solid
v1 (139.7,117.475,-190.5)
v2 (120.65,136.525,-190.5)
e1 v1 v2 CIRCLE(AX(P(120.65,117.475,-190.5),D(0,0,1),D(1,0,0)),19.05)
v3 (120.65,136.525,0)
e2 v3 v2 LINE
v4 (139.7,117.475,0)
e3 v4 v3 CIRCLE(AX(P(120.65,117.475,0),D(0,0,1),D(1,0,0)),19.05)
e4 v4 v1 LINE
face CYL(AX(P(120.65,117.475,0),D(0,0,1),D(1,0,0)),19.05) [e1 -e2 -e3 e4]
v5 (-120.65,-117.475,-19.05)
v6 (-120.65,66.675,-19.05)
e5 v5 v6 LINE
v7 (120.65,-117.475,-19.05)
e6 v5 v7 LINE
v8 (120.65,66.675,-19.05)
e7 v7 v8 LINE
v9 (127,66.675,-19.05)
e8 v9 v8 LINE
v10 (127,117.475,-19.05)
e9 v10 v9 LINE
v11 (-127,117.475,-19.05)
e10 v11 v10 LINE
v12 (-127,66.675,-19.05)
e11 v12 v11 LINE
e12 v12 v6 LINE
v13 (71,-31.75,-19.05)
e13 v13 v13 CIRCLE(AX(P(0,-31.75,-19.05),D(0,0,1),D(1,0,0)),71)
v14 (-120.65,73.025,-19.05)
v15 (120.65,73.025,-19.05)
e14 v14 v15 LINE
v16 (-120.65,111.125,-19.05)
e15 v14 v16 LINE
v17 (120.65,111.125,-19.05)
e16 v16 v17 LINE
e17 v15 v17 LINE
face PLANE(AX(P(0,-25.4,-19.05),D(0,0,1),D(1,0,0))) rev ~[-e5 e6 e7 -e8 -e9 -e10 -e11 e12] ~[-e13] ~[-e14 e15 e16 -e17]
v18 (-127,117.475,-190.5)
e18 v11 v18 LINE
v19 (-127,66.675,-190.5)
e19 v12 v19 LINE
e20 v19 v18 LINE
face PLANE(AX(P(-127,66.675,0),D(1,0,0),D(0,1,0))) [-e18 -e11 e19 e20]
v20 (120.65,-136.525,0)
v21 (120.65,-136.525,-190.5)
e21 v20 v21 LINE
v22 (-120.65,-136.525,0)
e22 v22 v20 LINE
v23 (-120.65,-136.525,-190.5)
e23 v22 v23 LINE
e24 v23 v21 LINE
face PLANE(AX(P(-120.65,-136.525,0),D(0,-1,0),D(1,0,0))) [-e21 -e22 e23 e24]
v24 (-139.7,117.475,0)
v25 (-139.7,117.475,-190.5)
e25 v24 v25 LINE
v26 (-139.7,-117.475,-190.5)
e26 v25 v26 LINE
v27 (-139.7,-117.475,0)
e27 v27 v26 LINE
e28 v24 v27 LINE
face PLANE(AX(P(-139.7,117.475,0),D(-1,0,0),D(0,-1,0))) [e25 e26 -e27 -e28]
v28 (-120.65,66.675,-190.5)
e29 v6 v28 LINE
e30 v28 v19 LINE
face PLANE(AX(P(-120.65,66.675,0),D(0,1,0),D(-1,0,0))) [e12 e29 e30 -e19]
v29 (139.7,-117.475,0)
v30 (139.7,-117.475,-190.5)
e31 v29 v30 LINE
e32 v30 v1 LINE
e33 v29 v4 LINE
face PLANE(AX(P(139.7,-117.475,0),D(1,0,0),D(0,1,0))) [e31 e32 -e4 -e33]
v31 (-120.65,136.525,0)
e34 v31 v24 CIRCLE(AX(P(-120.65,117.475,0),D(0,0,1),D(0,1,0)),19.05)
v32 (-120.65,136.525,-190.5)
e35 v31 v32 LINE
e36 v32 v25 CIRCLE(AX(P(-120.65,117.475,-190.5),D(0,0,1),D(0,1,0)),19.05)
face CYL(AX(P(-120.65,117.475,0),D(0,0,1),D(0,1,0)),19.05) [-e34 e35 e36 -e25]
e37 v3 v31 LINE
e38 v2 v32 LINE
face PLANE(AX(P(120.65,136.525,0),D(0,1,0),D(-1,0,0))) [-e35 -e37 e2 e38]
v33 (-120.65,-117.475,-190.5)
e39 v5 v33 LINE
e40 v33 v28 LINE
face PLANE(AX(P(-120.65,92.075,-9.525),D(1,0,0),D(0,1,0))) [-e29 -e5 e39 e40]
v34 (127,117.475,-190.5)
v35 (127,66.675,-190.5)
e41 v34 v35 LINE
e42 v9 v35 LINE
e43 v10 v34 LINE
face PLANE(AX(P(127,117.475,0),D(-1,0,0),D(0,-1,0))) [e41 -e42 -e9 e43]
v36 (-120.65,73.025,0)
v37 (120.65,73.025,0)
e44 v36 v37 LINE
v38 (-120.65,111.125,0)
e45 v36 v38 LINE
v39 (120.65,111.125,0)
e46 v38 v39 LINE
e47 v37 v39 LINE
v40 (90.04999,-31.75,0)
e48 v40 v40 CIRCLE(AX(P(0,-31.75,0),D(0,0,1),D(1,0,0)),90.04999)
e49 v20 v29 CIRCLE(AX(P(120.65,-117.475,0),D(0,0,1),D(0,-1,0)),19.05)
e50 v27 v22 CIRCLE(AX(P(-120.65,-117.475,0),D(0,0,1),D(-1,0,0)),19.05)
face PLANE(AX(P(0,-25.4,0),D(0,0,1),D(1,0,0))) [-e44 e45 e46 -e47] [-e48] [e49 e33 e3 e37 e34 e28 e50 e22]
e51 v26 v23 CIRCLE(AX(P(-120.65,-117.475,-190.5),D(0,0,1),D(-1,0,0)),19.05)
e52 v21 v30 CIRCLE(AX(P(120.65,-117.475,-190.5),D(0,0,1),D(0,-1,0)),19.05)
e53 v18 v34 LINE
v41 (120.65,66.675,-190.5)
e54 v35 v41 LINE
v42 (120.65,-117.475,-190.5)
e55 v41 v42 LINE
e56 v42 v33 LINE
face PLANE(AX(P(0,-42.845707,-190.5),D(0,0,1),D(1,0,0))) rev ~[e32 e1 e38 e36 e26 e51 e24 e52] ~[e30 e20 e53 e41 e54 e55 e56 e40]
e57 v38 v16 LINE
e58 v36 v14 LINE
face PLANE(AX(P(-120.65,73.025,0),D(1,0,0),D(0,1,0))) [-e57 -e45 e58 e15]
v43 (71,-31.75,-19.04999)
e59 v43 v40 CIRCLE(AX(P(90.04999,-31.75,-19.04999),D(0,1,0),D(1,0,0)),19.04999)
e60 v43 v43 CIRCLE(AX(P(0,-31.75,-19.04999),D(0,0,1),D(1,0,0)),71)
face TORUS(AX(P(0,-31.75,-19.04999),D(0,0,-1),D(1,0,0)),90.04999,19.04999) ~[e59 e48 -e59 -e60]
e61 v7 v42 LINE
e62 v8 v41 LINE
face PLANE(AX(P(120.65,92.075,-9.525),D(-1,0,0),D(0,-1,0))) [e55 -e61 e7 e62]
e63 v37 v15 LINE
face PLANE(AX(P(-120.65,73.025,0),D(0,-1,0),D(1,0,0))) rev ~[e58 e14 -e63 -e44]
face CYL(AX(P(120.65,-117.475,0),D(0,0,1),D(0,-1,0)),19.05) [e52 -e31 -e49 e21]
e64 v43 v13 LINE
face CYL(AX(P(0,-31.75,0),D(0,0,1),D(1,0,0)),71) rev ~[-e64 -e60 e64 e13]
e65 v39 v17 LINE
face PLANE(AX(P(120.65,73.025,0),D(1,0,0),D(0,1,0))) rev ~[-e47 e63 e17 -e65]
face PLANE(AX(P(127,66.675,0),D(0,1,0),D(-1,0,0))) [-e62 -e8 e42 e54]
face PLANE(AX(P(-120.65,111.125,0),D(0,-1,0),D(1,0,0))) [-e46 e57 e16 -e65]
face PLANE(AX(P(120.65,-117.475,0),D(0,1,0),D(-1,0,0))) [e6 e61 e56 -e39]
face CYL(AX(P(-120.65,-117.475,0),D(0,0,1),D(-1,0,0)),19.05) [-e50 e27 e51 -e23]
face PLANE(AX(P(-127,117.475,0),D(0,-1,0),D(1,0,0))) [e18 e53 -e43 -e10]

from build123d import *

# Parameters (mm, degrees)
F1_DEPTH = 190.5
F2_W     = 50.8
F2_H     = 19.05
F3_DEPTH = 6.35
F4_W     = 50.8
F4_H     = 19.05
F5_DEPTH = 6.35
F0_W     = 241.3
F0_H     = 184.15
F0_R     = 71
F0_H_2   = 38.1
F6_DEPTH = 19.05
F7_R     = 19.04999


# Not quite as in the source:
# - a fillet or chamfer is up to 0.001 mm smaller than in the source, because OpenCascade refuses the exact size


with BuildPart() as f1:
    # F0 (on Top) → F1 (new body)
    with BuildSketch(Plane.XY):
        with BuildLine():
            Line((-120.65, -136.525), (120.65, -136.525))
            ThreePointArc((120.65, -136.525), (134.1203841816, -130.9453841816), (139.7, -117.475))
            Line((139.7, -117.475), (139.7, 117.475))
            Line((139.7, 117.475), (127, 117.475))
            Line((127, 117.475), (127, 66.675))
            Line((127, 66.675), (120.65, 66.675))
            Line((120.65, 66.675), (120.65, -117.475))
            Line((120.65, -117.475), (-120.65, -117.475))
            Line((-120.65, -117.475), (-120.65, 66.675))
            Line((-120.65, 66.675), (-127, 66.675))
            Line((-127, 66.675), (-127, 117.475))
            Line((-127, 117.475), (-139.7, 117.475))
            Line((-139.7, 117.475), (-139.7, -117.475))
            ThreePointArc((-139.7, -117.475), (-134.1203841816, -130.9453841816), (-120.65, -136.525))
        make_face()
        with BuildLine():
            Line((127, 117.475), (139.7, 117.475))
            ThreePointArc((139.7, 117.475), (134.1203841816, 130.9453841816), (120.65, 136.525))
            Line((120.65, 136.525), (-120.65, 136.525))
            ThreePointArc((-120.65, 136.525), (-134.1203841816, 130.9453841816), (-139.7, 117.475))
            Line((-139.7, 117.475), (-127, 117.475))
            Line((-127, 117.475), (127, 117.475))
        make_face()
    extrude(amount=-F1_DEPTH)

    # F2 (on face) → F3 (join)
    with BuildSketch(Plane(origin=(127, 0, 0), x_dir=(0, -1, 0), z_dir=(-1, 0, 0))):
        with Locations((-92.075, -9.525)):
            Rectangle(F2_W, F2_H)
    extrude(amount=F3_DEPTH)

    # F4 (on face) → F5 (join)
    with BuildSketch(Plane.YZ.offset(-127)):
        with Locations((92.075, -9.525)):
            Rectangle(F4_W, F4_H)
    extrude(amount=F5_DEPTH)

    # F0 (on Top) → F6 (join)
    with BuildSketch(Plane.XY):
        with Locations((0, -25.4)):
            Rectangle(F0_W, F0_H)
        with Locations((0, -31.75)):
            Circle(F0_R, mode=Mode.SUBTRACT)
        Polygon((127, 66.675), (127, 117.475), (-127, 117.475), (-127, 66.675), (-120.65, 66.675), (120.65, 66.675), align=None)
        with Locations((0, 92.075)):
            Rectangle(F0_W, F0_H_2, mode=Mode.SUBTRACT)
    extrude(amount=-F6_DEPTH)

    # F7 (radius 19.05 in the source; OpenCascade refuses exactly that, so slightly less here)
    f7_edges = [f1.edges().sort_by_distance(p)[0] for p in [
        (-71, -31.75, 0),
    ]]
    fillet(f7_edges, radius=F7_R)


solid = f1.part
